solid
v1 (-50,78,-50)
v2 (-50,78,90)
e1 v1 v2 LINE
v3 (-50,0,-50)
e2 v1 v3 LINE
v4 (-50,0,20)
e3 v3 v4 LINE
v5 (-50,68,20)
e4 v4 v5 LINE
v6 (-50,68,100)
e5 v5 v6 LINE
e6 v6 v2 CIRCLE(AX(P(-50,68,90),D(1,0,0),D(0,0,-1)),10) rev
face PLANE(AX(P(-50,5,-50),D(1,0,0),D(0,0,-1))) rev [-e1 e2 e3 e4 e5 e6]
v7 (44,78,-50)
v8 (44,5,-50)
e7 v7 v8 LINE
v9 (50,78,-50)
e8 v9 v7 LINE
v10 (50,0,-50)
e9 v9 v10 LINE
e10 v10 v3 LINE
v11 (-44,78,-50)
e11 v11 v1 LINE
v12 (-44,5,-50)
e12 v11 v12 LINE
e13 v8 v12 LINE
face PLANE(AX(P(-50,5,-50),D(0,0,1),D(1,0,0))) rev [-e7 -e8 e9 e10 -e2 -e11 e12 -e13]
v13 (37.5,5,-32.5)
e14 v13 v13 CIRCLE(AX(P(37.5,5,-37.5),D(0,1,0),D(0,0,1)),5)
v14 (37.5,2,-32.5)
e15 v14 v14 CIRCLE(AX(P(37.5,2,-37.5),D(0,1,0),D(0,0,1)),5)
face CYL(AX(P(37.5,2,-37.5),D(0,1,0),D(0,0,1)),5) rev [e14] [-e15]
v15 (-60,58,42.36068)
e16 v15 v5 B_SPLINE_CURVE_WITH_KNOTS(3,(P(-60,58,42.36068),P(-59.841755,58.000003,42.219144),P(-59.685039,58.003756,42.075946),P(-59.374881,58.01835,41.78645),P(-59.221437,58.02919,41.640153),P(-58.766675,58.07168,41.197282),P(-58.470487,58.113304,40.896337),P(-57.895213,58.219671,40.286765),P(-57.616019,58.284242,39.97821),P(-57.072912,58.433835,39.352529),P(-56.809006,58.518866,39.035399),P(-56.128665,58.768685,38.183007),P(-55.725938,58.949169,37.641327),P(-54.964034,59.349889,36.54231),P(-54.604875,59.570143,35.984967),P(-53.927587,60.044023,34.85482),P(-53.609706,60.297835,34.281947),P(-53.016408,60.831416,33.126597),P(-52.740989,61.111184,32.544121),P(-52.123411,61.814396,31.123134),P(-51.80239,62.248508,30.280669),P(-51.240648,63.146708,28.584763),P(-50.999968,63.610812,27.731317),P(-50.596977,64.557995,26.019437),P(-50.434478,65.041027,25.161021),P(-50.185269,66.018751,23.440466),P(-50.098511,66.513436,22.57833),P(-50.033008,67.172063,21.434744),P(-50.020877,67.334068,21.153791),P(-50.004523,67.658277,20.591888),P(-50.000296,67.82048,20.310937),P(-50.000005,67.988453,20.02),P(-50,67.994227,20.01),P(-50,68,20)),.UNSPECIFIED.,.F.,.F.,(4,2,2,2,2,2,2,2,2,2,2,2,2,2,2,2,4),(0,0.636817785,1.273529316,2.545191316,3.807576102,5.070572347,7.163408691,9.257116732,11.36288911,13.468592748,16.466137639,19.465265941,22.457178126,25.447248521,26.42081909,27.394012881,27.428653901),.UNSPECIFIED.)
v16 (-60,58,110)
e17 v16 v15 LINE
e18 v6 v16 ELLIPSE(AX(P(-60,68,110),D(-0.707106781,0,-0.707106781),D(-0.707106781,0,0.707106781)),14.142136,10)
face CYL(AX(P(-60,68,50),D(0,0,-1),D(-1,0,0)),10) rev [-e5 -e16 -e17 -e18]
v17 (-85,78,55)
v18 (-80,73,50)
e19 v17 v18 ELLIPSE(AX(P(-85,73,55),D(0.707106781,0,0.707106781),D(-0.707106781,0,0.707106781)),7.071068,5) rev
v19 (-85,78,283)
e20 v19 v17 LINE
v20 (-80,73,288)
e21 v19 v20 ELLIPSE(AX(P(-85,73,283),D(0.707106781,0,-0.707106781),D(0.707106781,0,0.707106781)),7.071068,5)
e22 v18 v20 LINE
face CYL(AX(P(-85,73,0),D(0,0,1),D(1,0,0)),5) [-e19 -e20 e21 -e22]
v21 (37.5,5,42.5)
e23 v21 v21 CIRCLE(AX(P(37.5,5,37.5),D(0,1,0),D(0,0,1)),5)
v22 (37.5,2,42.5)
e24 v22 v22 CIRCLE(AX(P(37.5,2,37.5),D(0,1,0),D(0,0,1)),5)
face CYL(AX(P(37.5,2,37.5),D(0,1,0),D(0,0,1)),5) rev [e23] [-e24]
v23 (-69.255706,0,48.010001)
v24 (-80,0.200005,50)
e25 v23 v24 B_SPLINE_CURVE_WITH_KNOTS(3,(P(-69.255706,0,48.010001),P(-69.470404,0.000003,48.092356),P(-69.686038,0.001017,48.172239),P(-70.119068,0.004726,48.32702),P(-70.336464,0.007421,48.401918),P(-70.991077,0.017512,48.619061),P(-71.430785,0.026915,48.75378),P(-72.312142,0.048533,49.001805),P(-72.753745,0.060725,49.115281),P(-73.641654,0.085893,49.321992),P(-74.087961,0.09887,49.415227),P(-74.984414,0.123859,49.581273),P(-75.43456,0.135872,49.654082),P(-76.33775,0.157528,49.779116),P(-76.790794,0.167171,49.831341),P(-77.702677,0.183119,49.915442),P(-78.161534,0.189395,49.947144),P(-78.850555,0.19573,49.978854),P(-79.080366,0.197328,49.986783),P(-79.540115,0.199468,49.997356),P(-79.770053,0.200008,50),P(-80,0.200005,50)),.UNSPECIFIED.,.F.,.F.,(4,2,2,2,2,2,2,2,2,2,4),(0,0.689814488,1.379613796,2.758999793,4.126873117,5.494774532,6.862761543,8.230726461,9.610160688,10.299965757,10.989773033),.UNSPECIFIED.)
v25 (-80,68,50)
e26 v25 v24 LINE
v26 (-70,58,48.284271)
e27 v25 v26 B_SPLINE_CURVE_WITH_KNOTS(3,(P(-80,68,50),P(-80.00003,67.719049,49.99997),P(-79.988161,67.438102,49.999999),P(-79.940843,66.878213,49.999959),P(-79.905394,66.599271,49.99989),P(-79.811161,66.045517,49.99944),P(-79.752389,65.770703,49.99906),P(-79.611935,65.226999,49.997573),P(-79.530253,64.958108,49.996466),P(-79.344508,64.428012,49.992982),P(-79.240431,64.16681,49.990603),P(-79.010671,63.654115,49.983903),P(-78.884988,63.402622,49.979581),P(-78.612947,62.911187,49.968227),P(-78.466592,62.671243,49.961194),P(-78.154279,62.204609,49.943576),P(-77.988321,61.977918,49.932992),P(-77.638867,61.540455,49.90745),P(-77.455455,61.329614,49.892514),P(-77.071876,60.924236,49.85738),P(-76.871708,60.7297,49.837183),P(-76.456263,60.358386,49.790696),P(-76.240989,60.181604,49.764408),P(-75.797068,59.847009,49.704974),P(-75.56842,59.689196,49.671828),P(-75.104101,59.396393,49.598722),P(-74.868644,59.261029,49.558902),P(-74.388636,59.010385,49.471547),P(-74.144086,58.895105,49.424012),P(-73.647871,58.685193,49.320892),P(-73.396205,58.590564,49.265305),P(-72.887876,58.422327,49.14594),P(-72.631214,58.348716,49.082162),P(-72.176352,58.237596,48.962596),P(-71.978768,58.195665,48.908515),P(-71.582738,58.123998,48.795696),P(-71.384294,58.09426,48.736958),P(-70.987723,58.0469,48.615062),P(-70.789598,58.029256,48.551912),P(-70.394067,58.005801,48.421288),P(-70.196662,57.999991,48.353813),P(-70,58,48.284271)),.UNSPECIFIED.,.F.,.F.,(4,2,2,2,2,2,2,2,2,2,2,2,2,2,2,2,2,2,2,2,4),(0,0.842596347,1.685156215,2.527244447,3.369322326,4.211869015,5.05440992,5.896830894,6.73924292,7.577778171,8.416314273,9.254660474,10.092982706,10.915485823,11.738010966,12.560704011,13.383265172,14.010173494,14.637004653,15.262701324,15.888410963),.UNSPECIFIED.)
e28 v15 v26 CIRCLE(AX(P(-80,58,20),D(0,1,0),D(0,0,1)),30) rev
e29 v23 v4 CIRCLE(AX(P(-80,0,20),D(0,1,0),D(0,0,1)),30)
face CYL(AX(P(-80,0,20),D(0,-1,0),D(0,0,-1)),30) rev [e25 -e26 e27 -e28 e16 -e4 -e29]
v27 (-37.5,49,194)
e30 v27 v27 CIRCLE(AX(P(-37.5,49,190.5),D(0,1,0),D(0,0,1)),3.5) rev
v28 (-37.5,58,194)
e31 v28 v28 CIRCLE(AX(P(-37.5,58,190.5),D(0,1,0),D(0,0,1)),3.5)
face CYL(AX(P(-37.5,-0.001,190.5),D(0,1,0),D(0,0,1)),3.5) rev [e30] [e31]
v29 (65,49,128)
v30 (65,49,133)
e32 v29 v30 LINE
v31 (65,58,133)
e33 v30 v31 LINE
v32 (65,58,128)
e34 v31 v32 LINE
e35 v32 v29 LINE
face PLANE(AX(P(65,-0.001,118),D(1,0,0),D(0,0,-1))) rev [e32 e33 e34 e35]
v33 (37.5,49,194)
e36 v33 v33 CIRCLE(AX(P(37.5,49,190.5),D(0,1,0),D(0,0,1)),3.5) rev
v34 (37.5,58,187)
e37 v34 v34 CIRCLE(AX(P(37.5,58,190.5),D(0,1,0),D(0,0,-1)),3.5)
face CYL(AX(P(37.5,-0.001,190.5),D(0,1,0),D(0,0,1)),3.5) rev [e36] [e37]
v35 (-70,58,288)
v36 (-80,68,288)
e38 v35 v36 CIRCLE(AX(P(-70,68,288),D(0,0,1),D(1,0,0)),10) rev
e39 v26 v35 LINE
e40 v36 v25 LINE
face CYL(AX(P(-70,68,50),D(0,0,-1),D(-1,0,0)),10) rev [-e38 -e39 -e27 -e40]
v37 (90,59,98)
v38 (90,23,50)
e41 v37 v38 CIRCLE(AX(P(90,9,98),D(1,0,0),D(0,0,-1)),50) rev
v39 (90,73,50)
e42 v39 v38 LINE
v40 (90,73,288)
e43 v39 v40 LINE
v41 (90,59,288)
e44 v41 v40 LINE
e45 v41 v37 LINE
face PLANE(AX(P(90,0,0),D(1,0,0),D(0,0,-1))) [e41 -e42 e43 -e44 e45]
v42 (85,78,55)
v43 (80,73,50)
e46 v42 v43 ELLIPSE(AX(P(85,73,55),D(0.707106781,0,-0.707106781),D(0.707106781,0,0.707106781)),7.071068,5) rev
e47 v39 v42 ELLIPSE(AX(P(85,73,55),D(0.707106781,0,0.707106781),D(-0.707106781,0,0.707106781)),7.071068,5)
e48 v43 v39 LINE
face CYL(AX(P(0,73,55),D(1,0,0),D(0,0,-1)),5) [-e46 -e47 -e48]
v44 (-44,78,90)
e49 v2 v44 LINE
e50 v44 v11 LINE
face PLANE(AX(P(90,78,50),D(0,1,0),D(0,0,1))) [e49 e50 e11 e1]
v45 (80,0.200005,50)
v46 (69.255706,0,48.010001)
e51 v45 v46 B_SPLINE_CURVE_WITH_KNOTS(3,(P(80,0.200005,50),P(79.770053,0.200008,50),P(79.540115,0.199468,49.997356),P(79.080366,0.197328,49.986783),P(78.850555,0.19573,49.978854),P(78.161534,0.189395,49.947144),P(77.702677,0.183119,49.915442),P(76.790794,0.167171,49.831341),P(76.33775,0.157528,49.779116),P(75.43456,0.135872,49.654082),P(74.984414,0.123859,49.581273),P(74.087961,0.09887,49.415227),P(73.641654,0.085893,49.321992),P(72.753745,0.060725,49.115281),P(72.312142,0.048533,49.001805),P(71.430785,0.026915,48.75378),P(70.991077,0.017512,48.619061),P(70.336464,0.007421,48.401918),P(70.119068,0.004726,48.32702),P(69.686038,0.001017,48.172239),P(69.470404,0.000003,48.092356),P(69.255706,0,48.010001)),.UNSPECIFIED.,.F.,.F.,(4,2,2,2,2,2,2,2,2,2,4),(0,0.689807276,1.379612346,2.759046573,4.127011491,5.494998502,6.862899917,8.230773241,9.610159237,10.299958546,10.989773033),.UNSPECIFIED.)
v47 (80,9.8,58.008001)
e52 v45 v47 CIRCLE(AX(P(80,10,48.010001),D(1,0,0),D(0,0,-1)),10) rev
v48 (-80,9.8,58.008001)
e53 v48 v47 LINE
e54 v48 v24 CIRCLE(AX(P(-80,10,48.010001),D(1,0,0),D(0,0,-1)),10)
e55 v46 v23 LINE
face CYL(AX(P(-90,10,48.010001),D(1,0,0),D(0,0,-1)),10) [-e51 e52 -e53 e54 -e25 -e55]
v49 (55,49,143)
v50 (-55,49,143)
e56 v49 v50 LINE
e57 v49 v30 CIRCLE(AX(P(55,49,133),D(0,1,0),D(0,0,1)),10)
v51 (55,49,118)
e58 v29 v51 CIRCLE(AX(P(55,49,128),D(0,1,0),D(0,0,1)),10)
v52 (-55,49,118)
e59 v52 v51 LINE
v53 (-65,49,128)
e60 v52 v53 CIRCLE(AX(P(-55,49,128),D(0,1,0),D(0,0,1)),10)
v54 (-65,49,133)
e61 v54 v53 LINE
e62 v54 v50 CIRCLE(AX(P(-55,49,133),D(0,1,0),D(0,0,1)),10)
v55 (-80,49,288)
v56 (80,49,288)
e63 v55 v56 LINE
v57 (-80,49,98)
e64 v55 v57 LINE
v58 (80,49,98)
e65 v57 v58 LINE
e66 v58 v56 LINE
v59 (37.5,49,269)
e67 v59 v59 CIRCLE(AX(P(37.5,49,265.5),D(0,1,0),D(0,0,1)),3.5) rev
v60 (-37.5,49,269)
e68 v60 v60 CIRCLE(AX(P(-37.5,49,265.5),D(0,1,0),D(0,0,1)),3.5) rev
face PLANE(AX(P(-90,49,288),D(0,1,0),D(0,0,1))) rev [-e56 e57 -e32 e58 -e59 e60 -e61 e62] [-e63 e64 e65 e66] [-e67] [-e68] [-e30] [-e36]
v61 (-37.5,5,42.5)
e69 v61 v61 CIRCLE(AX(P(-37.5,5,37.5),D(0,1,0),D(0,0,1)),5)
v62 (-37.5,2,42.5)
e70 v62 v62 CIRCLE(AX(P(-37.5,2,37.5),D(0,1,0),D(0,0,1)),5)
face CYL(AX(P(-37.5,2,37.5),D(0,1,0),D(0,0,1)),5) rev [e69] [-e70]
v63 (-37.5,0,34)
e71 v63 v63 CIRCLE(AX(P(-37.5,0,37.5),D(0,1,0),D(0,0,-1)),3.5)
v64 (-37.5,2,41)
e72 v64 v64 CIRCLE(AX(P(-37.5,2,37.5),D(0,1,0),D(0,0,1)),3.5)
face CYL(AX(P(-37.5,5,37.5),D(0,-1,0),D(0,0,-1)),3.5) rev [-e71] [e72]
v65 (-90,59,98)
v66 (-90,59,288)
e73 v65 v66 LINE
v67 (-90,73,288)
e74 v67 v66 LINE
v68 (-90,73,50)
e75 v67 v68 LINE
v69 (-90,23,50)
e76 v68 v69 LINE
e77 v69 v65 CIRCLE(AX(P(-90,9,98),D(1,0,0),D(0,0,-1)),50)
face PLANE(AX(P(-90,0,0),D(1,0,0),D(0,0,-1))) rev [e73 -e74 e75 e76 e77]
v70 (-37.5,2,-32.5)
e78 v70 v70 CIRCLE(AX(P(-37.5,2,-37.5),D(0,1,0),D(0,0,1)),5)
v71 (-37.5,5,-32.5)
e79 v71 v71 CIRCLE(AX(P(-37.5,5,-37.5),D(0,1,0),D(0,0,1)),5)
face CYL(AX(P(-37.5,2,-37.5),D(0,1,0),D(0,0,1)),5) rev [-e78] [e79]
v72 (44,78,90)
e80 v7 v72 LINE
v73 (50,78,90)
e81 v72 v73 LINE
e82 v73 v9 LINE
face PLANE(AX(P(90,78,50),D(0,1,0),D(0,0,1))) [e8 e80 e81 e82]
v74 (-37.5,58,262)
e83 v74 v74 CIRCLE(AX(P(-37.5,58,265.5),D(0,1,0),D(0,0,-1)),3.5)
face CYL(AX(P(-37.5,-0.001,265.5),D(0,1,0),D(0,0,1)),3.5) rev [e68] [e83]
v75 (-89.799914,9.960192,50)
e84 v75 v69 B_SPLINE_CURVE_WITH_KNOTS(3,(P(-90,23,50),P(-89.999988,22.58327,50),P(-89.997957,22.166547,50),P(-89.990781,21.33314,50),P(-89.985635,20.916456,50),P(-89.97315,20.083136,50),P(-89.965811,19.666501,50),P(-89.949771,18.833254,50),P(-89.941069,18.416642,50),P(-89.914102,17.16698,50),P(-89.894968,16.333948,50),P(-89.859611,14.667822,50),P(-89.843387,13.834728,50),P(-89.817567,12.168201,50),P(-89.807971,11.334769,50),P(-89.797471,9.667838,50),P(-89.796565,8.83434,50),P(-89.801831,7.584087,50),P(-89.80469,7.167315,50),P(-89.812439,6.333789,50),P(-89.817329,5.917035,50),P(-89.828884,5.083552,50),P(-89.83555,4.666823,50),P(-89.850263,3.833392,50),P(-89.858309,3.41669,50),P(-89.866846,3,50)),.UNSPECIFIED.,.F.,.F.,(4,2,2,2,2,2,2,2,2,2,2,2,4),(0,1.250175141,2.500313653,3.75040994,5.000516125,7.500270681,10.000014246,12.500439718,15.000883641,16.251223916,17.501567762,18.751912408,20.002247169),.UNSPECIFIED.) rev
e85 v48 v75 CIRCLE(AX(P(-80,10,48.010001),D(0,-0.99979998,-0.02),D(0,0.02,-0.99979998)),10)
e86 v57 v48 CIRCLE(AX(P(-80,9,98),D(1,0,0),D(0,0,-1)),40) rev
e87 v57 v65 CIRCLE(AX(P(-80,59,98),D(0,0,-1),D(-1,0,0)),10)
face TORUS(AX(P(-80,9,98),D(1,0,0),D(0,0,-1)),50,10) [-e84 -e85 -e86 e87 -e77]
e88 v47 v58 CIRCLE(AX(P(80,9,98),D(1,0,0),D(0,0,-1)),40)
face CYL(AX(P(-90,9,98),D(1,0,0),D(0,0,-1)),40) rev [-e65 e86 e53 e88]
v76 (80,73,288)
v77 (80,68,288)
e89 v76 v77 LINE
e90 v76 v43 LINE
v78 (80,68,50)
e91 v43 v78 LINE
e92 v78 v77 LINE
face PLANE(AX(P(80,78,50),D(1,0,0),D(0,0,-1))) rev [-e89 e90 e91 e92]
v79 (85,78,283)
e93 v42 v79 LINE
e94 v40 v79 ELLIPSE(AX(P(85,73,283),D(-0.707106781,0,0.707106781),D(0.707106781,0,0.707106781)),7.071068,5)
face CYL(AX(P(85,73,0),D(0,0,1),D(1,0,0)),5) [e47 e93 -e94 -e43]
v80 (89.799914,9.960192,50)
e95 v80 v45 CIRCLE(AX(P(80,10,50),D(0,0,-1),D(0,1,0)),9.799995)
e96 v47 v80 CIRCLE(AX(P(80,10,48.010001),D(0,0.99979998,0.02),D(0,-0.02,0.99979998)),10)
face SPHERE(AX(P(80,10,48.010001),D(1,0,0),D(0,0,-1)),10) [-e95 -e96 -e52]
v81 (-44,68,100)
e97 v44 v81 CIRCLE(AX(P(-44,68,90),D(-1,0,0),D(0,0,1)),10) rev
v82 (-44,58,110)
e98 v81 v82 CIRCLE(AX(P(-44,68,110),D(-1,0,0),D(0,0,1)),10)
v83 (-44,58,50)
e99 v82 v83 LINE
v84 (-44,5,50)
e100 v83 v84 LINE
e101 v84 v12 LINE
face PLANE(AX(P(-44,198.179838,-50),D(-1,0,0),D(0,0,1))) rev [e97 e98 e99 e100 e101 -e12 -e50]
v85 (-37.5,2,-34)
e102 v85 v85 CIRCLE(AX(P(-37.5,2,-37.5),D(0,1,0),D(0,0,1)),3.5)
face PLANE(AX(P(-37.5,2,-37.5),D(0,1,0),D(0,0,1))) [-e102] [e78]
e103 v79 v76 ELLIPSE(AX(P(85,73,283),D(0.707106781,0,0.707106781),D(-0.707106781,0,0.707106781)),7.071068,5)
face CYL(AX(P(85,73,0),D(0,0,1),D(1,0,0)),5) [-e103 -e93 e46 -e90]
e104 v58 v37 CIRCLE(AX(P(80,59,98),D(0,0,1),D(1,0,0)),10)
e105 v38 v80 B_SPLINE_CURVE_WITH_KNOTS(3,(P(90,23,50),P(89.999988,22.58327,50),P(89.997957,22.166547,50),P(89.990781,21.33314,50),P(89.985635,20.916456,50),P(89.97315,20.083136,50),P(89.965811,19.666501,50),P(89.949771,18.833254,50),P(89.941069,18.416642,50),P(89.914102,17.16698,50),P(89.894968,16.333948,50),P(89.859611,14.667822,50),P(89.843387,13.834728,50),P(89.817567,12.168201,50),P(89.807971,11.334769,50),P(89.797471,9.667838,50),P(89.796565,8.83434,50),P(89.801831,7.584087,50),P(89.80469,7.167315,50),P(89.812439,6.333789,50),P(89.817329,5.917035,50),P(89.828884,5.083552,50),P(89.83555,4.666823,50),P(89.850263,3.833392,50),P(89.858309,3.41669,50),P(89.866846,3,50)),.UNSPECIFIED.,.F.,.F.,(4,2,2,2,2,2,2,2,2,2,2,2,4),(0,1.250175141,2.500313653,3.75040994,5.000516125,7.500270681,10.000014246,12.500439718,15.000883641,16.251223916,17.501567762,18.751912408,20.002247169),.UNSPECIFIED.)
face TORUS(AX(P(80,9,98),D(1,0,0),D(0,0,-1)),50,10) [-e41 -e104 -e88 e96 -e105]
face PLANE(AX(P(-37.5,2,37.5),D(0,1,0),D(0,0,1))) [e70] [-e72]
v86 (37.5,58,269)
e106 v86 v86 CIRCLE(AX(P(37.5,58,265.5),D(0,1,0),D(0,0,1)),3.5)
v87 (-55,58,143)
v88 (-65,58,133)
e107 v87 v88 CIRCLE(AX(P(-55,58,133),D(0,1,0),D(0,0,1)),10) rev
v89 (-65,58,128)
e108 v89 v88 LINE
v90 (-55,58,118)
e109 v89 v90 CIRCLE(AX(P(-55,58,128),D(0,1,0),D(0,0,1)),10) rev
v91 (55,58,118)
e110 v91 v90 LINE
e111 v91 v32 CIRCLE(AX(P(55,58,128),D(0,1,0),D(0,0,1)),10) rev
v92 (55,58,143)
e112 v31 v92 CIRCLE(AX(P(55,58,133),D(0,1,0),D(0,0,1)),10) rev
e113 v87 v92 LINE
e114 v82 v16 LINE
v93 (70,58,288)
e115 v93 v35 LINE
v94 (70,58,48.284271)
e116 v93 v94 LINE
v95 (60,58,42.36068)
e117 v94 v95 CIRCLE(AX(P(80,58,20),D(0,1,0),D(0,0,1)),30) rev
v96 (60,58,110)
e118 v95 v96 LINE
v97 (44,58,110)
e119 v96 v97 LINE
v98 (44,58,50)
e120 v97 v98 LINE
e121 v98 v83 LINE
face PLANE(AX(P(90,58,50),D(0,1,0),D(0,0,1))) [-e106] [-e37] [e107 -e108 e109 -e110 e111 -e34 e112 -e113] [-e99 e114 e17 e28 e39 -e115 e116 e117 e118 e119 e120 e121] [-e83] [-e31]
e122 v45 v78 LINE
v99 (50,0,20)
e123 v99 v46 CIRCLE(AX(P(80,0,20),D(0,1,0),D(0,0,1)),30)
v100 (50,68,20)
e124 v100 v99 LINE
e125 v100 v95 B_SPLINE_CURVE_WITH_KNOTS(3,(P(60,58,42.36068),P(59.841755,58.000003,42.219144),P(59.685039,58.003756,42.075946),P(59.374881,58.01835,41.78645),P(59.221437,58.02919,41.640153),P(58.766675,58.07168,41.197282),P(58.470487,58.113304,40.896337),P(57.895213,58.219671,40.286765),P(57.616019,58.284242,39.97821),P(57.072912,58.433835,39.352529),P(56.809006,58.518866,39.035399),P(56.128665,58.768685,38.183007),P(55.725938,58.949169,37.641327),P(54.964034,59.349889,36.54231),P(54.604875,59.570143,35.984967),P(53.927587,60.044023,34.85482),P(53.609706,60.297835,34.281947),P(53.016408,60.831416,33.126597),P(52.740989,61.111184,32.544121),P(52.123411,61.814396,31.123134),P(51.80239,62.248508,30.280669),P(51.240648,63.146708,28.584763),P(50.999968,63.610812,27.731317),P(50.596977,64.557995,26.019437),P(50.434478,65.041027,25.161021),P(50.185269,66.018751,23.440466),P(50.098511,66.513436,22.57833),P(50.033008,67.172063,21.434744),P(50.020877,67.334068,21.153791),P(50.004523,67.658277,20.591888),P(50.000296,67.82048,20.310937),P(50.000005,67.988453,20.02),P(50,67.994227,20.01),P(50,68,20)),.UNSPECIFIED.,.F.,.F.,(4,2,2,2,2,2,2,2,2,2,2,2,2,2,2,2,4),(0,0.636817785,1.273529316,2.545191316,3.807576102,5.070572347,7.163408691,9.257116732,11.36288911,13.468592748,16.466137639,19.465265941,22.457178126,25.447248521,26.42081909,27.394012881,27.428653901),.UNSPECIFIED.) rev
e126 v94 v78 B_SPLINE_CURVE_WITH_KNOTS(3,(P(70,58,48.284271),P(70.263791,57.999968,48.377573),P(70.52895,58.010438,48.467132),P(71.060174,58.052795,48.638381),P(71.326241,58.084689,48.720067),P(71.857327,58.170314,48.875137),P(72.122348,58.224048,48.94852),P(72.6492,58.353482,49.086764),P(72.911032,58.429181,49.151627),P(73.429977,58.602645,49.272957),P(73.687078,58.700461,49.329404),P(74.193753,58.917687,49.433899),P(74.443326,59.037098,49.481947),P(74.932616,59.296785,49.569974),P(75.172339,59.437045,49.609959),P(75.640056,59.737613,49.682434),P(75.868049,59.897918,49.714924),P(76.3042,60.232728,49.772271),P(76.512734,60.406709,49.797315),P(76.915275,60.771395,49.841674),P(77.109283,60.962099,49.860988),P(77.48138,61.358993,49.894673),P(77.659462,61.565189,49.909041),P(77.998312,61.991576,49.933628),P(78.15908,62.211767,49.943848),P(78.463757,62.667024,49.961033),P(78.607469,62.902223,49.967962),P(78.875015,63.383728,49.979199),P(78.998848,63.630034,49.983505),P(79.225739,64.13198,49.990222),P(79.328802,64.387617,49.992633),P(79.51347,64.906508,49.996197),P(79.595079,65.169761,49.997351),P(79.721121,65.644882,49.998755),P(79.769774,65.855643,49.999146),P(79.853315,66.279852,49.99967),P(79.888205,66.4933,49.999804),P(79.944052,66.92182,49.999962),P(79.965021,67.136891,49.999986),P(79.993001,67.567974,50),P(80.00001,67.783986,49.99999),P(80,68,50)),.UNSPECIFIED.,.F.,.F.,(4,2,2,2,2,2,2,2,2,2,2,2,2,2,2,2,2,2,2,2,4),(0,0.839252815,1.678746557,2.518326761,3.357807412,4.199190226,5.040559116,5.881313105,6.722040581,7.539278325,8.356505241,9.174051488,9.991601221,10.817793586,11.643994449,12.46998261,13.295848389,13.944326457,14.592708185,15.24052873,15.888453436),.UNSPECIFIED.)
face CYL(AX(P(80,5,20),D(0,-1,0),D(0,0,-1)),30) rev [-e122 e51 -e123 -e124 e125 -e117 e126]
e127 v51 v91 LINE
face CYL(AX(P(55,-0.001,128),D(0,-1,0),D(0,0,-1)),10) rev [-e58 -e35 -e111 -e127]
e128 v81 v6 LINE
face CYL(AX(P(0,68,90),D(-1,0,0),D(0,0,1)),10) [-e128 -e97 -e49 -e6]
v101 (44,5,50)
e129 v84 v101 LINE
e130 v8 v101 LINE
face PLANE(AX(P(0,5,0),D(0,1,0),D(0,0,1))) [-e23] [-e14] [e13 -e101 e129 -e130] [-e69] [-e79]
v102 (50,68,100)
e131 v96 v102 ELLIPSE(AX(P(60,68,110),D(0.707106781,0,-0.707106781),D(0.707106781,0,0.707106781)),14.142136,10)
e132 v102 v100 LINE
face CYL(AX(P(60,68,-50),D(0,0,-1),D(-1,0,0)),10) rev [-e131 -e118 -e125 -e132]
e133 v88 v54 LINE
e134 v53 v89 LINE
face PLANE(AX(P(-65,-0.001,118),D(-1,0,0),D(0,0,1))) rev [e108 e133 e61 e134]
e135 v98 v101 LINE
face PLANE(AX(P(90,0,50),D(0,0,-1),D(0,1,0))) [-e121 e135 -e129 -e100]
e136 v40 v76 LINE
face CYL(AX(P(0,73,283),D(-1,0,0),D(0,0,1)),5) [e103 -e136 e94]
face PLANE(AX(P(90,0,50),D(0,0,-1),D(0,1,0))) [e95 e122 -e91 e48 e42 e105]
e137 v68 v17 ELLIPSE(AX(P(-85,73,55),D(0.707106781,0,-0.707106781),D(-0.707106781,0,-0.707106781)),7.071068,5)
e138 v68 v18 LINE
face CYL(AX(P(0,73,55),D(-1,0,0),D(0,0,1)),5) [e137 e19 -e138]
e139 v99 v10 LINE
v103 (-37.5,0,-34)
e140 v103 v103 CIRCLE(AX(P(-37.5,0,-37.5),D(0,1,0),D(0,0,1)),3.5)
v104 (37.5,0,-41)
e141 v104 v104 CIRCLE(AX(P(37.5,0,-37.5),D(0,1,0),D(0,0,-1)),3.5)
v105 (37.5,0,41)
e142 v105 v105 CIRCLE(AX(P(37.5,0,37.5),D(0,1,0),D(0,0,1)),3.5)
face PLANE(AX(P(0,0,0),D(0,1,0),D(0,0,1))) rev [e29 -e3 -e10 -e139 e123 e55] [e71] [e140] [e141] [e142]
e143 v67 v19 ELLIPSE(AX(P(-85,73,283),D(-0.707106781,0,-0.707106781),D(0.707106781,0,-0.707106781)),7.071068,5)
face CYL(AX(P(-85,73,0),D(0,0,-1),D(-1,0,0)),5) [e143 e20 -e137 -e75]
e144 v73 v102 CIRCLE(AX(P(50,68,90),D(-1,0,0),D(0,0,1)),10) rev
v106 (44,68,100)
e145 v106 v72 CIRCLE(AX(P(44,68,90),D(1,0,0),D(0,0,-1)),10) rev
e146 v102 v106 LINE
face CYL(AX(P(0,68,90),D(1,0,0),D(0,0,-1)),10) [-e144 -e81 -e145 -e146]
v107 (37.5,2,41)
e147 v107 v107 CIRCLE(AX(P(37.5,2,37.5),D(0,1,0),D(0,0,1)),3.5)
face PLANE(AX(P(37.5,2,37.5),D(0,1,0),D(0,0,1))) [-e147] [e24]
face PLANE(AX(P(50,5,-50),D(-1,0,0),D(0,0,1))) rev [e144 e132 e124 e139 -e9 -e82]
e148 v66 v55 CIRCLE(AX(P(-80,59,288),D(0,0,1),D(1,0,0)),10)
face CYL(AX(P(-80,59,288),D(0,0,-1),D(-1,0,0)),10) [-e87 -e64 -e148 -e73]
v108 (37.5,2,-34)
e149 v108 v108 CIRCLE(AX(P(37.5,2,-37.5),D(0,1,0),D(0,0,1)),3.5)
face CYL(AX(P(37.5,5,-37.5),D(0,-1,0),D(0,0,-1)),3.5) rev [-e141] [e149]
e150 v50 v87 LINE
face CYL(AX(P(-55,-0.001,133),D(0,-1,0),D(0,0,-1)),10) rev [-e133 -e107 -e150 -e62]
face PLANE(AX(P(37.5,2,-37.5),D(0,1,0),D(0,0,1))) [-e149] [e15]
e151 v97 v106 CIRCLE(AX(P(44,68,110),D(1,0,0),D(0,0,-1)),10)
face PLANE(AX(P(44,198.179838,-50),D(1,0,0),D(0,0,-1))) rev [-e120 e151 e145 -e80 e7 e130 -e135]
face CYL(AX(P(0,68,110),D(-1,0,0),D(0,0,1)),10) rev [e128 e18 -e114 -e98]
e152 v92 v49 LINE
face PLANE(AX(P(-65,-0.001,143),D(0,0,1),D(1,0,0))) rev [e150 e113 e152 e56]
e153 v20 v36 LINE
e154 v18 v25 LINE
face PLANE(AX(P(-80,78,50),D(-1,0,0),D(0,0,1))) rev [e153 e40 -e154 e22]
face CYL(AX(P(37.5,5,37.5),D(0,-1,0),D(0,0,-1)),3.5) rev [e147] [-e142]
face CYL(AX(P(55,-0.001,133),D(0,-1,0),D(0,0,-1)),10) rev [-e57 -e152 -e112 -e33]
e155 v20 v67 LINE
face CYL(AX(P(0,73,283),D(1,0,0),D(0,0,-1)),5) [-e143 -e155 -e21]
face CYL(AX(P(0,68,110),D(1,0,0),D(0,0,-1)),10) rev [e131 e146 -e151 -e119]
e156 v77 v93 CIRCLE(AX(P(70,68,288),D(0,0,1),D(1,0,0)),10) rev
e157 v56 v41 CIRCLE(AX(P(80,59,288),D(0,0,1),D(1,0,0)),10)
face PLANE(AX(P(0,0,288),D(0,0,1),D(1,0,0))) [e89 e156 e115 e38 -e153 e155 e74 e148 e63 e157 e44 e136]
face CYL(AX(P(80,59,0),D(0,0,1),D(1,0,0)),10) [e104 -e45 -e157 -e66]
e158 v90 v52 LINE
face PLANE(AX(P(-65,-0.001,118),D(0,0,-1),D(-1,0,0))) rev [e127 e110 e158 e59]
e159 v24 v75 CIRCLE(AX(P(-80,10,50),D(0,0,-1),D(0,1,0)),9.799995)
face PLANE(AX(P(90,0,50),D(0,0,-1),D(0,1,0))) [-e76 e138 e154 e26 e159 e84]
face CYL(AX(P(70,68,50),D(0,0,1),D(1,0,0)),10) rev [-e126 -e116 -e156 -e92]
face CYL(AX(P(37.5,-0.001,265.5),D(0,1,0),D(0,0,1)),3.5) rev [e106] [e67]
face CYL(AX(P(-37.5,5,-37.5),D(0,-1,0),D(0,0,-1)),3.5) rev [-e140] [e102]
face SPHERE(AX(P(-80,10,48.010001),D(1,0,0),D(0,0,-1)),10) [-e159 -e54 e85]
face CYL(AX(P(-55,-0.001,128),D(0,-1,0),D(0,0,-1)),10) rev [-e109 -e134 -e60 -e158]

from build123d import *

# Parameters (mm, degrees)
SKETCH1_W           = 100
SKETCH1_H           = 100
SKETCH1_R           = 3.5
BOSS_EXTRUDE1_DEPTH = 5
CUT_EXTRUDE1_START  = -5
SKETCH6_R           = 5
CUT_EXTRUDE1_DEPTH  = 3
BOSS_EXTRUDE2_START = 40
SKETCH8_W           = 8
SKETCH8_H           = 58
BOSS_EXTRUDE2_DEPTH = 180
SKETCH9_W           = 180
SKETCH9_H           = 9
BOSS_EXTRUDE3_DEPTH = 230
SKETCH13_R          = 3.5
CUT_EXTRUDE3_DEPTH  = 9
SKETCH15_W          = 6
SKETCH15_H          = 100
BOSS_EXTRUDE6_DEPTH = 73
CUT_EXTRUDE4_REACH  = 309.259
SKETCH16_W          = 130
SKETCH16_H          = 25
FILLET1_R           = 40
FILLET2_R           = 10
SKETCH17_W          = 6
SKETCH17_H          = 20
BOSS_EXTRUDE7_DEPTH = 50
FILLET3_R           = 10
FILLET4_R           = 10
FILLET6_R           = 30
FILLET7_R           = 10
SKETCH18_W          = 10
SKETCH18_H          = 238
BOSS_EXTRUDE8_DEPTH = 20
FILLET8_R           = 10
FILLET9_R           = 10
FILLET10_R          = 5


# Some blends are built 0.0001 mm under size
with BuildPart() as part:
    # Sketch1 → Boss-Extrude1 (new body)
    with BuildSketch(Plane(origin=(0, 0, 0), x_dir=(1, 0, 0), z_dir=(0, 1, 0))):
        Rectangle(SKETCH1_W, SKETCH1_H)
        with Locations(Location((-37.5, 37.5, 0), (0, 0, 270))):
            Circle(SKETCH1_R, mode=Mode.SUBTRACT)
        with Locations(Location((37.5, 37.5, 0), (0, 0, 90))):
            Circle(SKETCH1_R, mode=Mode.SUBTRACT)
        with Locations(Location((37.5, -37.5, 0), (0, 0, 270))):
            Circle(SKETCH1_R, mode=Mode.SUBTRACT)
        with Locations(Location((-37.5, -37.5, 0), (0, 0, 90))):
            Circle(SKETCH1_R, mode=Mode.SUBTRACT)
    extrude(amount=BOSS_EXTRUDE1_DEPTH)

    # Sketch6 → Cut-Extrude1 (cut)
    with BuildSketch(Plane.XZ.offset(CUT_EXTRUDE1_START)):
        with Locations(Location((-37.5, 37.5, 0), (0, 0, 90))):
            Circle(SKETCH6_R)
        with Locations(Location((37.5, 37.5, 0), (0, 0, 90))):
            Circle(SKETCH6_R)
        with Locations(Location((37.5, -37.5, 0), (0, 0, 90))):
            Circle(SKETCH6_R)
        with Locations(Location((-37.5, -37.5, 0), (0, 0, 90))):
            Circle(SKETCH6_R)
    extrude(amount=CUT_EXTRUDE1_DEPTH, mode=Mode.SUBTRACT)

    # Sketch8 → Boss-Extrude2 (add)
    with BuildSketch(Plane.ZY.offset(50).offset(BOSS_EXTRUDE2_START)):
        with Locations((54, 29)):
            Rectangle(SKETCH8_W, SKETCH8_H)
    extrude(amount=-BOSS_EXTRUDE2_DEPTH)

    # Sketch9 → Boss-Extrude3 (add)
    with BuildSketch(Plane.XY.offset(58)):
        with Locations((0, 53.5)):
            Rectangle(SKETCH9_W, SKETCH9_H)
    extrude(amount=BOSS_EXTRUDE3_DEPTH)

    # Sketch13 → Cut-Extrude3 (cut)
    with BuildSketch(Plane(origin=(0, 58, 0), x_dir=(1, 0, 0), z_dir=(0, 1, 0))):
        with Locations(Location((-37.5, -190.5, 0), (0, 0, 270))):
            Circle(SKETCH13_R)
        with Locations(Location((37.5, -190.5, 0), (0, 0, 270))):
            Circle(SKETCH13_R)
        with Locations(Location((37.5, -265.5, 0), (0, 0, 270))):
            Circle(SKETCH13_R)
        with Locations(Location((-37.5, -265.5, 0), (0, 0, 270))):
            Circle(SKETCH13_R)
    extrude(amount=-CUT_EXTRUDE3_DEPTH, mode=Mode.SUBTRACT)

    # Sketch15 → Boss-Extrude6 (add)
    with BuildSketch(Plane(origin=(0, 5, 0), x_dir=(1, 0, 0), z_dir=(0, 1, 0))):
        with Locations((-47, 0)):
            Rectangle(SKETCH15_W, SKETCH15_H)
        with Locations((47, 0)):
            Rectangle(SKETCH15_W, SKETCH15_H)
    extrude(amount=BOSS_EXTRUDE6_DEPTH)

    # Sketch16 → Cut-Extrude4 (cut, up to next)
    with BuildSketch(Plane(origin=(0, 58, 0), x_dir=(1, 0, 0), z_dir=(0, 1, 0)), mode=Mode.PRIVATE) as cut_extrude4_sk1:
        with Locations((0, -130.5)):
            Rectangle(SKETCH16_W, SKETCH16_H)
    cut_extrude4_tool1 = extrude(cut_extrude4_sk1.sketch, amount=-CUT_EXTRUDE4_REACH, mode=Mode.PRIVATE) & part.part
    add(cut_extrude4_tool1.solids().sort_by_distance((0, 58, 130.5))[0], mode=Mode.SUBTRACT)

    # Fillet1
    fillet1_edges = [part.edges().sort_by_distance(p)[0] for p in [
        (0, 49, 58),
    ]]
    fillet(fillet1_edges, radius=FILLET1_R)

    # Fillet2
    fillet2_edges = [part.edges().sort_by_distance(p)[0] for p in [
        (65, 53.5, 118),
        (65, 53.5, 143),
        (-65, 53.5, 143),
        (-65, 53.5, 118),
    ]]
    fillet(fillet2_edges, radius=FILLET2_R)

    # Sketch17 → Boss-Extrude7 (add)
    with BuildSketch(Plane.XY.offset(50)):
        with Locations((-47, 68)):
            Rectangle(SKETCH17_W, SKETCH17_H)
        with Locations((47, 68)):
            Rectangle(SKETCH17_W, SKETCH17_H)
    extrude(amount=BOSS_EXTRUDE7_DEPTH)

    # Fillet3
    fillet3_edges = [part.edges().sort_by_distance(p)[0] for p in [
        (47, 78, 100),
        (-47, 78, 100),
    ]]
    fillet(fillet3_edges, radius=FILLET3_R)

    # Fillet4
    fillet4_edges = [part.edges().sort_by_distance(p)[0] for p in [
        (47, 58, 100),
        (-47, 58, 100),
    ]]
    fillet(fillet4_edges, radius=FILLET4_R - 0.0001)  # a hair under: the kernel refuses the full size

    # Fillet6
    fillet6_edges = [part.edges().sort_by_distance(p)[0] for p in [
        (50, 29, 50),
        (-50, 29, 50),
    ]]
    fillet(fillet6_edges, radius=FILLET6_R)

    # Fillet7
    # the kernel refuses this fillet: 10 mm, written as the material it takes off along each edge
    with BuildSketch(Plane(origin=(-114.974997499, 0, 58), x_dir=(0, 0.9999996667390088, 0.0008164079075175184), z_dir=(1, 0, 0))) as fillet7_piece_1:
        with BuildLine():
            CenterArc((9.991840753, -9.99815975), FILLET7_R, 91.099215266, 88.854008002)
            Line((-0.008155914, -9.989995671), (-1.008155581, -9.989179263))
            Line((-1.008155581, -9.989179263), (-0.999999667, 0.000816408))
            Line((-0.999999667, 0.000816408), (0.000816408, 0.999999667))
            ThreePointArc((0.000816408, 0.999999667), (9.000813409, 0.992651996), (9.780819517, 0.999815975))
            Line((9.780819517, 0.999815975), (9.800003266, 0))
        make_face()
    extrude(amount=229.949994999, mode=Mode.SUBTRACT)

    # Sketch18 → Boss-Extrude8 (add)
    with BuildSketch(Plane(origin=(0, 58, 0), x_dir=(1, 0, 0), z_dir=(0, 1, 0))):
        with Locations((-85, -169)):
            Rectangle(SKETCH18_W, SKETCH18_H)
        with Locations((85, -169)):
            Rectangle(SKETCH18_W, SKETCH18_H)
    extrude(amount=BOSS_EXTRUDE8_DEPTH)

    # Fillet8
    # the kernel refuses this fillet: 10 mm, written as the material it adds along each edge
    with BuildSketch(Plane(origin=(80, 58, 25), x_dir=(0, 1, 0), z_dir=(0, 0, 1))) as fillet8_piece_1_section:
        with BuildLine():
            CenterArc((FILLET8_R, FILLET8_R), FILLET8_R, 180, 90)
            Line((0, FILLET8_R), (0, 0))
            Line((0, 0), (FILLET8_R, 0))
        make_face()
    fillet8_piece_1 = extrude(amount=263, mode=Mode.PRIVATE)
    fillet8_piece_1 = fillet8_piece_1 - Plane(origin=(80, 58.60546515, 20), x_dir=(-1, 0, 0), z_dir=(0, -1, 0)) * Cylinder(30, 567, mode=Mode.PRIVATE)
    add(fillet8_piece_1)
    with BuildSketch(Plane(origin=(-80, 58, 25), x_dir=(0, 1, 0), z_dir=(0, 0, 1))) as fillet8_piece_2_section:
        with BuildLine():
            CenterArc((FILLET8_R, -FILLET8_R), FILLET8_R, 90, 90)
            Line((0, -FILLET8_R), (0, 0))
            Line((0, 0), (FILLET8_R, 0))
        make_face()
    fillet8_piece_2 = extrude(amount=263, mode=Mode.PRIVATE)
    fillet8_piece_2 = fillet8_piece_2 - Plane(origin=(-80, 58.605465201, 20), x_dir=(0, 0, 1), z_dir=(0, -1, 0)) * Cylinder(30, 567, mode=Mode.PRIVATE)
    add(fillet8_piece_2)
    # the kernel refuses this fillet: 10 mm, written as the material it takes off along each edge
    with BuildSketch(Plane(origin=(90, 49, 98), x_dir=(-1, 0, 0), z_dir=(0, 0, 1))) as fillet8_2_piece_1:
        with BuildLine():
            CenterArc((FILLET8_R, -FILLET8_R), FILLET8_R, 90, 90)
            Line((0, -FILLET8_R), (0, 0))
            Line((0, 0), (FILLET8_R, 0))
        make_face()
    extrude(amount=215, mode=Mode.SUBTRACT)
    with BuildSketch(Plane(origin=(90, 10, 48.010001), x_dir=(0, 0.6665779251845226, -0.7454353557866013), z_dir=(0, 0.7454353557866013, 0.6665779251845226))) as fillet8_2_piece_2:
        with BuildLine():
            CenterArc((10 - FILLET8_R, FILLET8_R), FILLET8_R, 270, 90)
            Line((10 - FILLET8_R, 0), (10, 0))
            Line((10, 0), (10, FILLET8_R))
        make_face()
    revolve(axis=Axis((90, 10, 48.010001), (-1, 0, 0)), revolution_arc=220.657501671, mode=Mode.SUBTRACT)
    with BuildSketch(Plane(origin=(-90, 10, 48.010001), x_dir=(0, 0.6665779251845226, -0.7454353557866013), z_dir=(0, 0.7454353557866013, 0.6665779251845226))) as fillet8_2_piece_3:
        with BuildLine():
            CenterArc((10 - FILLET8_R, -FILLET8_R), FILLET8_R, 0, 90)
            Line((10 - FILLET8_R, 0), (10, 0))
            Line((10, 0), (10, -FILLET8_R))
        make_face()
    revolve(axis=Axis((-90, 10, 48.010001), (-1, 0, 0)), revolution_arc=220.657501671, mode=Mode.SUBTRACT)
    with BuildSketch(Plane(origin=(-90, 49, 98), x_dir=(1, 0, 0), z_dir=(0, 0, 1))) as fillet8_2_piece_4:
        with BuildLine():
            CenterArc((FILLET8_R, FILLET8_R), FILLET8_R, 180, 90)
            Line((0, FILLET8_R), (0, 0))
            Line((0, 0), (FILLET8_R, 0))
        make_face()
    extrude(amount=215, mode=Mode.SUBTRACT)
    with BuildSketch(Plane(origin=(90, 9, 98), x_dir=(0, 0.019999999999999886, -0.999799979995999), z_dir=(0, -0.999799979995999, -0.019999999999999886))) as fillet8_2_piece_5:
        with BuildLine():
            CenterArc((40 + FILLET8_R, -FILLET8_R), FILLET8_R, 90, 90)
            Line((40 + FILLET8_R, 0), (40, 0))
            Line((40, 0), (40, -FILLET8_R))
        make_face()
    revolve(axis=Axis((90, 9, 98), (1, 0, 0)), revolution_arc=88.854008002, mode=Mode.SUBTRACT)
    with BuildSketch(Plane(origin=(-90, 9, 98), x_dir=(0, 0.019999999999999886, -0.999799979995999), z_dir=(0, -0.999799979995999, -0.019999999999999886))) as fillet8_2_piece_6:
        with BuildLine():
            CenterArc((40 + FILLET8_R, FILLET8_R), FILLET8_R, 180, 90)
            Line((40 + FILLET8_R, 0), (40, 0))
            Line((40, 0), (40, FILLET8_R))
        make_face()
    revolve(axis=Axis((-90, 9, 98), (1, 0, 0)), revolution_arc=88.854008002, mode=Mode.SUBTRACT)

    # Fillet9
    fillet9_edges = [part.edges().sort_by_distance(p)[0] for p in [
        (50, 58, 64.99995),
        (-50, 58, 64.99995),
    ]]
    fillet(fillet9_edges, radius=FILLET9_R)

    # Fillet10
    fillet10_edges = [part.edges().sort_by_distance(p)[0] for p in [
        (-90, 78, 169),
        (-85, 78, 288),
        (-80, 78, 169),
        (-85, 78, 50),
        (90, 78, 169),
        (85, 78, 50),
        (80, 78, 169),
        (85, 78, 288),
    ]]
    fillet(fillet10_edges, radius=FILLET10_R - 0.0001)  # a hair under: the kernel refuses the full size


solid = part.part
